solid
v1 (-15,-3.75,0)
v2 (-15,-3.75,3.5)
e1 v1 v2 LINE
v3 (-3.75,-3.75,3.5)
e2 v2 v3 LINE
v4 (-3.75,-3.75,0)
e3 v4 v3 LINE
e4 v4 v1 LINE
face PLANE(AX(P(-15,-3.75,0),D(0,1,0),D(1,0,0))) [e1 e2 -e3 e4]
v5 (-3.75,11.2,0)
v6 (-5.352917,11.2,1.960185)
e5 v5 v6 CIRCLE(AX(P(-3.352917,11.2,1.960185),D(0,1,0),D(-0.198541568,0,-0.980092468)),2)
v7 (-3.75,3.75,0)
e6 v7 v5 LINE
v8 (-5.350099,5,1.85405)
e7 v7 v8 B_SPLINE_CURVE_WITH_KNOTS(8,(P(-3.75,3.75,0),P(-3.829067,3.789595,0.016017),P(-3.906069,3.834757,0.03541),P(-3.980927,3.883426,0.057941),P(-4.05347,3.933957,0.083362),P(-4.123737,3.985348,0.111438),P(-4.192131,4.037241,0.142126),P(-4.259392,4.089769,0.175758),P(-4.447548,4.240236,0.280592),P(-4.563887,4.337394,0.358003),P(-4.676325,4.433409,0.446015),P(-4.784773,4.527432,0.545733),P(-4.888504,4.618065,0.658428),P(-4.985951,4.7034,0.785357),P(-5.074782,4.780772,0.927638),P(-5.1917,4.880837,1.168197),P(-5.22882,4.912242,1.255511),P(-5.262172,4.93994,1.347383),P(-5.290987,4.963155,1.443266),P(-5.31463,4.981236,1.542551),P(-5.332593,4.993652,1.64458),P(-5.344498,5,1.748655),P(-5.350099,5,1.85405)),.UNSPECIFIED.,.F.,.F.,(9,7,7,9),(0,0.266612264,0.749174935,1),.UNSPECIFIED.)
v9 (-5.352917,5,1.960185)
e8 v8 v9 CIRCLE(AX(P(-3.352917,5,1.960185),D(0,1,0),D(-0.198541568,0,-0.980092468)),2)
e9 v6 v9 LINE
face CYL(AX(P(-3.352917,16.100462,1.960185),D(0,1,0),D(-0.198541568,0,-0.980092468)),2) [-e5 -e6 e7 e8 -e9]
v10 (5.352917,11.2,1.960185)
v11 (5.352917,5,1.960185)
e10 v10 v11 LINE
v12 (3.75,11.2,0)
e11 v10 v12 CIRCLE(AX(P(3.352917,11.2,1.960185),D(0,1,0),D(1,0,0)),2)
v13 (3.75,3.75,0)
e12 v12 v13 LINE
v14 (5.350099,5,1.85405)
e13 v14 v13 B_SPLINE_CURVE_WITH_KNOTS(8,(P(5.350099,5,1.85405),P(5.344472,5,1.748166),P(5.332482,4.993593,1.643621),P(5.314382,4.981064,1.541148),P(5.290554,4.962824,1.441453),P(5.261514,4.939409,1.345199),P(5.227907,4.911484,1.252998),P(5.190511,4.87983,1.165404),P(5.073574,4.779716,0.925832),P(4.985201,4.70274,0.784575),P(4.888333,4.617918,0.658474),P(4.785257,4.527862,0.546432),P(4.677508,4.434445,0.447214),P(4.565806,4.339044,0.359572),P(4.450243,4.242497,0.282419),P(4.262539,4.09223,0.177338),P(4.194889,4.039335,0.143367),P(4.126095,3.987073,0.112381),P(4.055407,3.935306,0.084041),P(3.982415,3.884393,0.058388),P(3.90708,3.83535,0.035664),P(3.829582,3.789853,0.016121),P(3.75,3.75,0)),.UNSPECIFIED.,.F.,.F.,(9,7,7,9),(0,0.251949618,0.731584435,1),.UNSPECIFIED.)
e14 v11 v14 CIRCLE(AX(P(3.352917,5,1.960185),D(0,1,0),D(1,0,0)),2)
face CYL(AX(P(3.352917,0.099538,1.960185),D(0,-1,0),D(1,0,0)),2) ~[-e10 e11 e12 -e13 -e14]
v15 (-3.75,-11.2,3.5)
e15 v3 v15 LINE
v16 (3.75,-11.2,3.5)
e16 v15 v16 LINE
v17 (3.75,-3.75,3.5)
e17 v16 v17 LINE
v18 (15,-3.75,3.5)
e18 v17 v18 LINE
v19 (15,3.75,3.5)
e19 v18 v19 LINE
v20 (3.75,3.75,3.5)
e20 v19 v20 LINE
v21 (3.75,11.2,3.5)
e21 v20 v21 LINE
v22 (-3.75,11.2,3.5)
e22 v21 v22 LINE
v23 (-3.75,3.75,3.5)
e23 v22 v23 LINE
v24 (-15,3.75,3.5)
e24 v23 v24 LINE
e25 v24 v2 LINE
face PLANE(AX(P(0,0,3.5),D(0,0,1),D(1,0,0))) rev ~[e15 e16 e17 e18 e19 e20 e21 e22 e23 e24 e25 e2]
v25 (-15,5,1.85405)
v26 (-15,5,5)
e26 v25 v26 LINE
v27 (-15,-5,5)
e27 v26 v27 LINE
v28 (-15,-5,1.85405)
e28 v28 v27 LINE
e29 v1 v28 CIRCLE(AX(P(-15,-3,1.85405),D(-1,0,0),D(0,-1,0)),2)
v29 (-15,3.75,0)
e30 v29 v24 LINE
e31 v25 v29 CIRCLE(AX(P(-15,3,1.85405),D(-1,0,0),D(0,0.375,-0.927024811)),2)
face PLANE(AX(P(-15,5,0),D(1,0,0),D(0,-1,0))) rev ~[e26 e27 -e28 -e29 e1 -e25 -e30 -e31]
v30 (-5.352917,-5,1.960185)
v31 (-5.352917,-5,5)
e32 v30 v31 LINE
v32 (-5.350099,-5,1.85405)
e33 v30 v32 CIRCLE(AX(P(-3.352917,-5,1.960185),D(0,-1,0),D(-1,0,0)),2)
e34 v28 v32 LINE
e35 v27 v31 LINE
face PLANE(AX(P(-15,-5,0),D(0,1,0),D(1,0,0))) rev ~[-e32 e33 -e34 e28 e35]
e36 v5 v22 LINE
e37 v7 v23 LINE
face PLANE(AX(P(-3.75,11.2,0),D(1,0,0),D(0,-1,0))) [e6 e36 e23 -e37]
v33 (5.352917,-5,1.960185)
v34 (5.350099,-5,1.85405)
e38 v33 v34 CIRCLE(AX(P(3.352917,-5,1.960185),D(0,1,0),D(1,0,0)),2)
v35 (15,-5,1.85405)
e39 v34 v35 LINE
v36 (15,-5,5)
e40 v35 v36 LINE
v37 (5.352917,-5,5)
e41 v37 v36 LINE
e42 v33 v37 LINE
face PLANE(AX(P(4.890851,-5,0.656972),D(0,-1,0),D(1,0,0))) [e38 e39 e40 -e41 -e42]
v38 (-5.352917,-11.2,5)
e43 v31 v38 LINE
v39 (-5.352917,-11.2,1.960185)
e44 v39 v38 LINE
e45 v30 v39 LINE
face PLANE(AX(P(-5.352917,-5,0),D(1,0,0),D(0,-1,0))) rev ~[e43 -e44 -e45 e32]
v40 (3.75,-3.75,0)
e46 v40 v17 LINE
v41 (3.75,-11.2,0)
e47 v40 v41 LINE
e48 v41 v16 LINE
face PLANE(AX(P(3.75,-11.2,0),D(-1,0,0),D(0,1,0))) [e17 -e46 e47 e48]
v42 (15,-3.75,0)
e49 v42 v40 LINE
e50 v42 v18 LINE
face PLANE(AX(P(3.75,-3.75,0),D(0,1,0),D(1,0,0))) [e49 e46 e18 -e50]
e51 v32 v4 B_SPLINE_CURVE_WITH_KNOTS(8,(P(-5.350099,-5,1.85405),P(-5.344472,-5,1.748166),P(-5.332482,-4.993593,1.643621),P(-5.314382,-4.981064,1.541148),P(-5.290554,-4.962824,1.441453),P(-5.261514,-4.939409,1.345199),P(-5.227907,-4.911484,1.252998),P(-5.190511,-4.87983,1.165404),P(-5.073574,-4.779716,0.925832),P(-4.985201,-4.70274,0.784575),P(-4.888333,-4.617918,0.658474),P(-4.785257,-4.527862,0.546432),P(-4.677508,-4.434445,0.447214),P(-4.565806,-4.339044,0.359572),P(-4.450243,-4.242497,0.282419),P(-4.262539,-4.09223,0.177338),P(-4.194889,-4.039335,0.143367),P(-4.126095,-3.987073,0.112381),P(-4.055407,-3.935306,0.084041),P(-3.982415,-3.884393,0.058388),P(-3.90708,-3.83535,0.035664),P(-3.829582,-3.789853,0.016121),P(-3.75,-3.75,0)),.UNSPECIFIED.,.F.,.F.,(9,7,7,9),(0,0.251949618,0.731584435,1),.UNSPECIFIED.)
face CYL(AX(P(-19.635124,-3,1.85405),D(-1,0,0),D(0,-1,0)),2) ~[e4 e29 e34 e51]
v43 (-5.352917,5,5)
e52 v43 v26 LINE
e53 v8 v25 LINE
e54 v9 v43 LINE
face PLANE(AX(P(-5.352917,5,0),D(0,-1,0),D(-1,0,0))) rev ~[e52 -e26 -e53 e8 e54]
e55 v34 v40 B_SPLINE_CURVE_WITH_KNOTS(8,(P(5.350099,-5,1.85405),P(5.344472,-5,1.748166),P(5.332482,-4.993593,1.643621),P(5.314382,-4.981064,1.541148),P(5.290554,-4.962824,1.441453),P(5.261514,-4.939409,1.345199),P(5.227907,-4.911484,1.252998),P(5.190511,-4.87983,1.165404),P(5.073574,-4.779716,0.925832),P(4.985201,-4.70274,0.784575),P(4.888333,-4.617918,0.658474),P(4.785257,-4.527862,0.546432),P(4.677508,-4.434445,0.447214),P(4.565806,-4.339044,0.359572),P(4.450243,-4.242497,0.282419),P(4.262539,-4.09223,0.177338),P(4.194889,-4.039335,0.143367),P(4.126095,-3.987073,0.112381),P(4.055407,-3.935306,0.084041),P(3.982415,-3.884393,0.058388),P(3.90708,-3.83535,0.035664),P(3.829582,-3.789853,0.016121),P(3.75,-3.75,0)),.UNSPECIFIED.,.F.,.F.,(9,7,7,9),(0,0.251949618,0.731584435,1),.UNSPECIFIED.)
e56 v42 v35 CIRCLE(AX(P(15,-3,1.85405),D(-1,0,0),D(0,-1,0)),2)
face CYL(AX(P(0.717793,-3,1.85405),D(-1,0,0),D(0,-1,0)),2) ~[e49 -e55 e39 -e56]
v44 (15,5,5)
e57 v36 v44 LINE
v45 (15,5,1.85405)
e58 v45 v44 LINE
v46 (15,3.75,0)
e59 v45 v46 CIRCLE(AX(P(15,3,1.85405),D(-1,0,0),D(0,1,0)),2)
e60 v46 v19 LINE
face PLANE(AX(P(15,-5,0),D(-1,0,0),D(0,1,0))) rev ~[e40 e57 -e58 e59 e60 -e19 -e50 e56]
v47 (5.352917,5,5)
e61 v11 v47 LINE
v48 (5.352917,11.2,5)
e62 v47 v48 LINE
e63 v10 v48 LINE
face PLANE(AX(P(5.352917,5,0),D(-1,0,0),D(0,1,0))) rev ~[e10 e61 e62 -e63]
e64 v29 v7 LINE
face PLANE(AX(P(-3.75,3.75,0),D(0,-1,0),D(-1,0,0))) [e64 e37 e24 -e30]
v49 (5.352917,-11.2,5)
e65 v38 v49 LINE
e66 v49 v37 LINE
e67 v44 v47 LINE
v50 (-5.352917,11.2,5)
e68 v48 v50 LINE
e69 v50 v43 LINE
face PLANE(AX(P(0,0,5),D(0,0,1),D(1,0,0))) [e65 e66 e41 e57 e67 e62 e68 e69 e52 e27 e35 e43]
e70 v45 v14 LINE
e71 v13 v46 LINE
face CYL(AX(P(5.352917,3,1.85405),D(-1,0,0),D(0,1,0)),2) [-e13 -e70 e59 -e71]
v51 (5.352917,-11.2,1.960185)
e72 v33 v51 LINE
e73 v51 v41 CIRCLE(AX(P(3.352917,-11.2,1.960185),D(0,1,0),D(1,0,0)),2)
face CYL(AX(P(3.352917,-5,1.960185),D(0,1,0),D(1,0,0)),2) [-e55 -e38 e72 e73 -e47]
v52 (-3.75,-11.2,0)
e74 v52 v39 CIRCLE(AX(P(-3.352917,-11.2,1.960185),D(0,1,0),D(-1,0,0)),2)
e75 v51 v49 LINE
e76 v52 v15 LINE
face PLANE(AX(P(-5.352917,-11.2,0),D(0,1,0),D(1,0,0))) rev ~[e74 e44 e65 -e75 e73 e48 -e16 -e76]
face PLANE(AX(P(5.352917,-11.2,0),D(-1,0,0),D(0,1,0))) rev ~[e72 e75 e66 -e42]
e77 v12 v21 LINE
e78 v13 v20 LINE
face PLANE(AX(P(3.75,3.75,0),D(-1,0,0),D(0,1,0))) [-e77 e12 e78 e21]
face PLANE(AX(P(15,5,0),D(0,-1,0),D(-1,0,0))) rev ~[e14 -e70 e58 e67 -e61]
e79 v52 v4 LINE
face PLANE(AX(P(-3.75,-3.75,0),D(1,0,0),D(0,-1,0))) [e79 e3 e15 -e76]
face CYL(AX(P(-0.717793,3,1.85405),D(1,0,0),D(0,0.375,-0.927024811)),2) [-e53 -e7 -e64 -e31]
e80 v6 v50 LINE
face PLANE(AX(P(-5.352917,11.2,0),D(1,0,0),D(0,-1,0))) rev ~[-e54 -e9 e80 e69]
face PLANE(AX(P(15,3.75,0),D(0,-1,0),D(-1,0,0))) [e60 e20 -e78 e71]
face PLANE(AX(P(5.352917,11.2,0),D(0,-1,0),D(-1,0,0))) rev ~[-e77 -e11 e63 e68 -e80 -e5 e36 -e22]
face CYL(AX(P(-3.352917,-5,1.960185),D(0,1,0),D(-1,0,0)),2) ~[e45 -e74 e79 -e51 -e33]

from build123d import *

# Parameters (mm, degrees)
F2_DEPTH     = 5
F3_DEPTH     = 3.5
F4_T1_DEPTH  = 14.2822071908
F4_T3_DEPTH  = 11.1004623397
F4_T5_DEPTH  = 14.2822071908
F4_T7_DEPTH  = 11.1004623397
F4_T13_DEPTH = 11.1004623397
F4_T18_DEPTH = 14.2822071908
F4_T26_DEPTH = 14.2822071908
F4_T31_DEPTH = 11.1004623397
F4_T39_DEPTH = 14.2822071908
F4_T44_DEPTH = 11.1004623397
F4_T52_DEPTH = 11.1004623397
F4_T57_DEPTH = 14.2822071908


# Not quite as in the source:
# - a fillet or chamfer that OpenCascade refuses, or shapes differently, is made with other operations: its cross-section is extruded or revolved along the edge and cut away or added


with BuildPart() as f2:
    # F1 (on Top) → F2 (new body)
    with BuildSketch(Plane.XY):
        Polygon((-5.3529168636, -11.2), (5.3529168636, -11.2), (5.3529168636, -5), (15, -5), (15, 5), (5.3529168636, 5), (5.3529168636, 11.2), (-5.3529168636, 11.2), (-5.3529168636, 5), (-15, 5), (-15, -5), (-5.3529168636, -5), align=None)
    extrude(amount=F2_DEPTH)

    # F0 (on Top) → F3 (cut)
    with BuildSketch(Plane.XY):
        Polygon((-3.75, -11.2), (3.75, -11.2), (3.75, -3.75), (15, -3.75), (15, 3.75), (3.75, 3.75), (3.75, 11.2), (-3.75, 11.2), (-3.75, 3.75), (-15, 3.75), (-15, -3.75), (-3.75, -3.75), align=None)
    extrude(amount=F3_DEPTH, mode=Mode.SUBTRACT)

    # F4: fillet of radius 2 on 8 edges, made by hand

    # F4_s2 → F4_t1 (cut)
    with BuildSketch(Plane.YZ.offset(5.3529168636)):
        with BuildLine():
            ThreePointArc((5, 1.8540496218), (4.6583123952, 0.736015633), (3.75, 0))
            Line((3.75, 0), (5, 0))
            Line((5, 0), (5, 1.8540496218))
        make_face()
        with BuildLine():
            ThreePointArc((-5, 1.8540496218), (-4.6583123952, 0.736015633), (-3.75, 0))
            Line((-3.75, 0), (-5, 0))
            Line((-5, 0), (-5, 1.8540496218))
        make_face()
    extrude(amount=F4_T1_DEPTH, mode=Mode.SUBTRACT)

    # F4_s4 → F4_t3 (cut)
    with BuildSketch(Plane.XZ.offset(-16.1004623397)):
        with BuildLine():
            ThreePointArc((-3.75, 0), (-4.9011685022, 0.6941214052), (-5.3529168636, 1.9601849359))
            Line((-5.3529168636, 1.9601849359), (-5.3529168636, 0))
            Line((-5.3529168636, 0), (-3.75, 0))
        make_face()
        with BuildLine():
            ThreePointArc((5.3529168636, 1.9601849359), (4.9011685022, 0.6941214052), (3.75, 0))
            Line((3.75, 0), (5.3529168636, 0))
            Line((5.3529168636, 0), (5.3529168636, 1.9601849359))
        make_face()
    extrude(amount=F4_T3_DEPTH, mode=Mode.SUBTRACT)

    # F4_s6 → F4_t5 (cut)
    with BuildSketch(Plane.YZ.offset(-19.6351240544)):
        with BuildLine():
            ThreePointArc((3.75, 0), (4.6583123952, 0.736015633), (5, 1.8540496218))
            Line((5, 1.8540496218), (5, 0))
            Line((5, 0), (3.75, 0))
        make_face()
        with BuildLine():
            ThreePointArc((-5, 1.8540496218), (-4.6583123952, 0.736015633), (-3.75, 0))
            Line((-3.75, 0), (-5, 0))
            Line((-5, 0), (-5, 1.8540496218))
        make_face()
    extrude(amount=F4_T5_DEPTH, mode=Mode.SUBTRACT)

    # F4_s8 → F4_t7 (cut)
    with BuildSketch(Plane.XZ.offset(5)):
        with BuildLine():
            ThreePointArc((-5.3529168636, 1.9601849359), (-4.9011685022, 0.6941214052), (-3.75, 0))
            Line((-3.75, 0), (-5.3529168636, 0))
            Line((-5.3529168636, 0), (-5.3529168636, 1.9601849359))
        make_face()
        with BuildLine():
            ThreePointArc((5.3529168636, 1.9601849359), (4.9011685022, 0.6941214052), (3.75, 0))
            Line((3.75, 0), (5.3529168636, 0))
            Line((5.3529168636, 0), (5.3529168636, 1.9601849359))
        make_face()
    extrude(amount=F4_T7_DEPTH, mode=Mode.SUBTRACT)


with BuildPart() as f4_tool11:
    # F4_s12 → F4_t13 (new body)
    with BuildSketch(Plane.XZ.offset(-0.0995376603)):
        with BuildLine():
            ThreePointArc((5.3529168636, 1.9601849359), (4.9011685022, 0.6941214052), (3.75, 0))
            Line((3.75, 0), (5.3529168636, 0))
            Line((5.3529168636, 0), (5.3529168636, 1.9601849359))
        make_face()
    extrude(amount=-F4_T13_DEPTH)

    split(bisect_by=Plane.XZ.offset(-5), keep=Keep.TOP)

    split(bisect_by=Plane.XZ.offset(-3.75), keep=Keep.BOTTOM)


with BuildPart() as f4_tool16:
    # F4_s17 → F4_t18 (new body)
    with BuildSketch(Plane.YZ.offset(15)):
        with BuildLine():
            ThreePointArc((5, 1.8540496218), (4.6583123952, 0.736015633), (3.75, 0))
            Line((3.75, 0), (5, 0))
            Line((5, 0), (5, 1.8540496218))
        make_face()
    extrude(amount=-F4_T18_DEPTH)

    split(bisect_by=Plane.YZ.offset(5.3529168636), keep=Keep.BOTTOM)

    split(bisect_by=Plane.YZ.offset(3.75), keep=Keep.TOP)


with BuildPart() as f4_tool11_1:
    add(f4_tool11.part)

    # F4_t21: intersect F4_tool16
    add(f4_tool16.part, mode=Mode.INTERSECT)


with BuildPart() as f2_1:
    add(f2.part)

    # F4_t9: cut F4_tool11
    add(f4_tool11_1.part, mode=Mode.SUBTRACT)


with BuildPart() as f4_tool24:
    # F4_s25 → F4_t26 (new body)
    with BuildSketch(Plane.YZ.offset(-0.7177928092)):
        with BuildLine():
            ThreePointArc((3.75, 0), (4.6583123952, 0.736015633), (5, 1.8540496218))
            Line((5, 1.8540496218), (5, 0))
            Line((5, 0), (3.75, 0))
        make_face()
    extrude(amount=-F4_T26_DEPTH)

    split(bisect_by=Plane.YZ.offset(-3.75), keep=Keep.BOTTOM)

    split(bisect_by=Plane.YZ.offset(-5.3529168636), keep=Keep.TOP)


with BuildPart() as f4_tool29:
    # F4_s30 → F4_t31 (new body)
    with BuildSketch(Plane.XZ.offset(-11.2)):
        with BuildLine():
            ThreePointArc((-3.75, 0), (-4.9011685022, 0.6941214052), (-5.3529168636, 1.9601849359))
            Line((-5.3529168636, 1.9601849359), (-5.3529168636, 0))
            Line((-5.3529168636, 0), (-3.75, 0))
        make_face()
    extrude(amount=F4_T31_DEPTH)

    split(bisect_by=Plane.XZ.offset(-5), keep=Keep.TOP)

    split(bisect_by=Plane.XZ.offset(-3.75), keep=Keep.BOTTOM)


with BuildPart() as f4_tool24_1:
    add(f4_tool24.part)

    # F4_t34: intersect F4_tool29
    add(f4_tool29.part, mode=Mode.INTERSECT)


with BuildPart() as f2_2:
    add(f2_1.part)

    # F4_t22: cut F4_tool24
    add(f4_tool24_1.part, mode=Mode.SUBTRACT)


with BuildPart() as f4_tool37:
    # F4_s38 → F4_t39 (new body)
    with BuildSketch(Plane.YZ.offset(-15)):
        with BuildLine():
            ThreePointArc((-5, 1.8540496218), (-4.6583123952, 0.736015633), (-3.75, 0))
            Line((-3.75, 0), (-5, 0))
            Line((-5, 0), (-5, 1.8540496218))
        make_face()
    extrude(amount=F4_T39_DEPTH)

    split(bisect_by=Plane.YZ.offset(-5.3529168636), keep=Keep.TOP)

    split(bisect_by=Plane.YZ.offset(-3.75), keep=Keep.BOTTOM)


with BuildPart() as f4_tool42:
    # F4_s43 → F4_t44 (new body)
    with BuildSketch(Plane.XZ.offset(0.0995376603)):
        with BuildLine():
            ThreePointArc((-5.3529168636, 1.9601849359), (-4.9011685022, 0.6941214052), (-3.75, 0))
            Line((-3.75, 0), (-5.3529168636, 0))
            Line((-5.3529168636, 0), (-5.3529168636, 1.9601849359))
        make_face()
    extrude(amount=F4_T44_DEPTH)

    split(bisect_by=Plane.XZ.offset(5), keep=Keep.BOTTOM)

    split(bisect_by=Plane.XZ.offset(3.75), keep=Keep.TOP)


with BuildPart() as f4_tool37_1:
    add(f4_tool37.part)

    # F4_t47: intersect F4_tool42
    add(f4_tool42.part, mode=Mode.INTERSECT)


with BuildPart() as f2_3:
    add(f2_2.part)

    # F4_t35: cut F4_tool37
    add(f4_tool37_1.part, mode=Mode.SUBTRACT)


with BuildPart() as f4_tool50:
    # F4_s51 → F4_t52 (new body)
    with BuildSketch(Plane.XZ.offset(11.2)):
        with BuildLine():
            ThreePointArc((5.3529168636, 1.9601849359), (4.9011685022, 0.6941214052), (3.75, 0))
            Line((3.75, 0), (5.3529168636, 0))
            Line((5.3529168636, 0), (5.3529168636, 1.9601849359))
        make_face()
    extrude(amount=-F4_T52_DEPTH)

    split(bisect_by=Plane.XZ.offset(5), keep=Keep.BOTTOM)

    split(bisect_by=Plane.XZ.offset(3.75), keep=Keep.TOP)


with BuildPart() as f4_tool55:
    # F4_s56 → F4_t57 (new body)
    with BuildSketch(Plane.YZ.offset(0.7177928092)):
        with BuildLine():
            ThreePointArc((-5, 1.8540496218), (-4.6583123952, 0.736015633), (-3.75, 0))
            Line((-3.75, 0), (-5, 0))
            Line((-5, 0), (-5, 1.8540496218))
        make_face()
    extrude(amount=F4_T57_DEPTH)

    split(bisect_by=Plane.YZ.offset(5.3529168636), keep=Keep.BOTTOM)

    split(bisect_by=Plane.YZ.offset(3.75), keep=Keep.TOP)


with BuildPart() as f4_tool50_1:
    add(f4_tool50.part)

    # F4_t60: intersect F4_tool55
    add(f4_tool55.part, mode=Mode.INTERSECT)


with BuildPart() as f2_4:
    add(f2_3.part)

    # F4_t48: cut F4_tool50
    add(f4_tool50_1.part, mode=Mode.SUBTRACT)


solid = f2_4.part
